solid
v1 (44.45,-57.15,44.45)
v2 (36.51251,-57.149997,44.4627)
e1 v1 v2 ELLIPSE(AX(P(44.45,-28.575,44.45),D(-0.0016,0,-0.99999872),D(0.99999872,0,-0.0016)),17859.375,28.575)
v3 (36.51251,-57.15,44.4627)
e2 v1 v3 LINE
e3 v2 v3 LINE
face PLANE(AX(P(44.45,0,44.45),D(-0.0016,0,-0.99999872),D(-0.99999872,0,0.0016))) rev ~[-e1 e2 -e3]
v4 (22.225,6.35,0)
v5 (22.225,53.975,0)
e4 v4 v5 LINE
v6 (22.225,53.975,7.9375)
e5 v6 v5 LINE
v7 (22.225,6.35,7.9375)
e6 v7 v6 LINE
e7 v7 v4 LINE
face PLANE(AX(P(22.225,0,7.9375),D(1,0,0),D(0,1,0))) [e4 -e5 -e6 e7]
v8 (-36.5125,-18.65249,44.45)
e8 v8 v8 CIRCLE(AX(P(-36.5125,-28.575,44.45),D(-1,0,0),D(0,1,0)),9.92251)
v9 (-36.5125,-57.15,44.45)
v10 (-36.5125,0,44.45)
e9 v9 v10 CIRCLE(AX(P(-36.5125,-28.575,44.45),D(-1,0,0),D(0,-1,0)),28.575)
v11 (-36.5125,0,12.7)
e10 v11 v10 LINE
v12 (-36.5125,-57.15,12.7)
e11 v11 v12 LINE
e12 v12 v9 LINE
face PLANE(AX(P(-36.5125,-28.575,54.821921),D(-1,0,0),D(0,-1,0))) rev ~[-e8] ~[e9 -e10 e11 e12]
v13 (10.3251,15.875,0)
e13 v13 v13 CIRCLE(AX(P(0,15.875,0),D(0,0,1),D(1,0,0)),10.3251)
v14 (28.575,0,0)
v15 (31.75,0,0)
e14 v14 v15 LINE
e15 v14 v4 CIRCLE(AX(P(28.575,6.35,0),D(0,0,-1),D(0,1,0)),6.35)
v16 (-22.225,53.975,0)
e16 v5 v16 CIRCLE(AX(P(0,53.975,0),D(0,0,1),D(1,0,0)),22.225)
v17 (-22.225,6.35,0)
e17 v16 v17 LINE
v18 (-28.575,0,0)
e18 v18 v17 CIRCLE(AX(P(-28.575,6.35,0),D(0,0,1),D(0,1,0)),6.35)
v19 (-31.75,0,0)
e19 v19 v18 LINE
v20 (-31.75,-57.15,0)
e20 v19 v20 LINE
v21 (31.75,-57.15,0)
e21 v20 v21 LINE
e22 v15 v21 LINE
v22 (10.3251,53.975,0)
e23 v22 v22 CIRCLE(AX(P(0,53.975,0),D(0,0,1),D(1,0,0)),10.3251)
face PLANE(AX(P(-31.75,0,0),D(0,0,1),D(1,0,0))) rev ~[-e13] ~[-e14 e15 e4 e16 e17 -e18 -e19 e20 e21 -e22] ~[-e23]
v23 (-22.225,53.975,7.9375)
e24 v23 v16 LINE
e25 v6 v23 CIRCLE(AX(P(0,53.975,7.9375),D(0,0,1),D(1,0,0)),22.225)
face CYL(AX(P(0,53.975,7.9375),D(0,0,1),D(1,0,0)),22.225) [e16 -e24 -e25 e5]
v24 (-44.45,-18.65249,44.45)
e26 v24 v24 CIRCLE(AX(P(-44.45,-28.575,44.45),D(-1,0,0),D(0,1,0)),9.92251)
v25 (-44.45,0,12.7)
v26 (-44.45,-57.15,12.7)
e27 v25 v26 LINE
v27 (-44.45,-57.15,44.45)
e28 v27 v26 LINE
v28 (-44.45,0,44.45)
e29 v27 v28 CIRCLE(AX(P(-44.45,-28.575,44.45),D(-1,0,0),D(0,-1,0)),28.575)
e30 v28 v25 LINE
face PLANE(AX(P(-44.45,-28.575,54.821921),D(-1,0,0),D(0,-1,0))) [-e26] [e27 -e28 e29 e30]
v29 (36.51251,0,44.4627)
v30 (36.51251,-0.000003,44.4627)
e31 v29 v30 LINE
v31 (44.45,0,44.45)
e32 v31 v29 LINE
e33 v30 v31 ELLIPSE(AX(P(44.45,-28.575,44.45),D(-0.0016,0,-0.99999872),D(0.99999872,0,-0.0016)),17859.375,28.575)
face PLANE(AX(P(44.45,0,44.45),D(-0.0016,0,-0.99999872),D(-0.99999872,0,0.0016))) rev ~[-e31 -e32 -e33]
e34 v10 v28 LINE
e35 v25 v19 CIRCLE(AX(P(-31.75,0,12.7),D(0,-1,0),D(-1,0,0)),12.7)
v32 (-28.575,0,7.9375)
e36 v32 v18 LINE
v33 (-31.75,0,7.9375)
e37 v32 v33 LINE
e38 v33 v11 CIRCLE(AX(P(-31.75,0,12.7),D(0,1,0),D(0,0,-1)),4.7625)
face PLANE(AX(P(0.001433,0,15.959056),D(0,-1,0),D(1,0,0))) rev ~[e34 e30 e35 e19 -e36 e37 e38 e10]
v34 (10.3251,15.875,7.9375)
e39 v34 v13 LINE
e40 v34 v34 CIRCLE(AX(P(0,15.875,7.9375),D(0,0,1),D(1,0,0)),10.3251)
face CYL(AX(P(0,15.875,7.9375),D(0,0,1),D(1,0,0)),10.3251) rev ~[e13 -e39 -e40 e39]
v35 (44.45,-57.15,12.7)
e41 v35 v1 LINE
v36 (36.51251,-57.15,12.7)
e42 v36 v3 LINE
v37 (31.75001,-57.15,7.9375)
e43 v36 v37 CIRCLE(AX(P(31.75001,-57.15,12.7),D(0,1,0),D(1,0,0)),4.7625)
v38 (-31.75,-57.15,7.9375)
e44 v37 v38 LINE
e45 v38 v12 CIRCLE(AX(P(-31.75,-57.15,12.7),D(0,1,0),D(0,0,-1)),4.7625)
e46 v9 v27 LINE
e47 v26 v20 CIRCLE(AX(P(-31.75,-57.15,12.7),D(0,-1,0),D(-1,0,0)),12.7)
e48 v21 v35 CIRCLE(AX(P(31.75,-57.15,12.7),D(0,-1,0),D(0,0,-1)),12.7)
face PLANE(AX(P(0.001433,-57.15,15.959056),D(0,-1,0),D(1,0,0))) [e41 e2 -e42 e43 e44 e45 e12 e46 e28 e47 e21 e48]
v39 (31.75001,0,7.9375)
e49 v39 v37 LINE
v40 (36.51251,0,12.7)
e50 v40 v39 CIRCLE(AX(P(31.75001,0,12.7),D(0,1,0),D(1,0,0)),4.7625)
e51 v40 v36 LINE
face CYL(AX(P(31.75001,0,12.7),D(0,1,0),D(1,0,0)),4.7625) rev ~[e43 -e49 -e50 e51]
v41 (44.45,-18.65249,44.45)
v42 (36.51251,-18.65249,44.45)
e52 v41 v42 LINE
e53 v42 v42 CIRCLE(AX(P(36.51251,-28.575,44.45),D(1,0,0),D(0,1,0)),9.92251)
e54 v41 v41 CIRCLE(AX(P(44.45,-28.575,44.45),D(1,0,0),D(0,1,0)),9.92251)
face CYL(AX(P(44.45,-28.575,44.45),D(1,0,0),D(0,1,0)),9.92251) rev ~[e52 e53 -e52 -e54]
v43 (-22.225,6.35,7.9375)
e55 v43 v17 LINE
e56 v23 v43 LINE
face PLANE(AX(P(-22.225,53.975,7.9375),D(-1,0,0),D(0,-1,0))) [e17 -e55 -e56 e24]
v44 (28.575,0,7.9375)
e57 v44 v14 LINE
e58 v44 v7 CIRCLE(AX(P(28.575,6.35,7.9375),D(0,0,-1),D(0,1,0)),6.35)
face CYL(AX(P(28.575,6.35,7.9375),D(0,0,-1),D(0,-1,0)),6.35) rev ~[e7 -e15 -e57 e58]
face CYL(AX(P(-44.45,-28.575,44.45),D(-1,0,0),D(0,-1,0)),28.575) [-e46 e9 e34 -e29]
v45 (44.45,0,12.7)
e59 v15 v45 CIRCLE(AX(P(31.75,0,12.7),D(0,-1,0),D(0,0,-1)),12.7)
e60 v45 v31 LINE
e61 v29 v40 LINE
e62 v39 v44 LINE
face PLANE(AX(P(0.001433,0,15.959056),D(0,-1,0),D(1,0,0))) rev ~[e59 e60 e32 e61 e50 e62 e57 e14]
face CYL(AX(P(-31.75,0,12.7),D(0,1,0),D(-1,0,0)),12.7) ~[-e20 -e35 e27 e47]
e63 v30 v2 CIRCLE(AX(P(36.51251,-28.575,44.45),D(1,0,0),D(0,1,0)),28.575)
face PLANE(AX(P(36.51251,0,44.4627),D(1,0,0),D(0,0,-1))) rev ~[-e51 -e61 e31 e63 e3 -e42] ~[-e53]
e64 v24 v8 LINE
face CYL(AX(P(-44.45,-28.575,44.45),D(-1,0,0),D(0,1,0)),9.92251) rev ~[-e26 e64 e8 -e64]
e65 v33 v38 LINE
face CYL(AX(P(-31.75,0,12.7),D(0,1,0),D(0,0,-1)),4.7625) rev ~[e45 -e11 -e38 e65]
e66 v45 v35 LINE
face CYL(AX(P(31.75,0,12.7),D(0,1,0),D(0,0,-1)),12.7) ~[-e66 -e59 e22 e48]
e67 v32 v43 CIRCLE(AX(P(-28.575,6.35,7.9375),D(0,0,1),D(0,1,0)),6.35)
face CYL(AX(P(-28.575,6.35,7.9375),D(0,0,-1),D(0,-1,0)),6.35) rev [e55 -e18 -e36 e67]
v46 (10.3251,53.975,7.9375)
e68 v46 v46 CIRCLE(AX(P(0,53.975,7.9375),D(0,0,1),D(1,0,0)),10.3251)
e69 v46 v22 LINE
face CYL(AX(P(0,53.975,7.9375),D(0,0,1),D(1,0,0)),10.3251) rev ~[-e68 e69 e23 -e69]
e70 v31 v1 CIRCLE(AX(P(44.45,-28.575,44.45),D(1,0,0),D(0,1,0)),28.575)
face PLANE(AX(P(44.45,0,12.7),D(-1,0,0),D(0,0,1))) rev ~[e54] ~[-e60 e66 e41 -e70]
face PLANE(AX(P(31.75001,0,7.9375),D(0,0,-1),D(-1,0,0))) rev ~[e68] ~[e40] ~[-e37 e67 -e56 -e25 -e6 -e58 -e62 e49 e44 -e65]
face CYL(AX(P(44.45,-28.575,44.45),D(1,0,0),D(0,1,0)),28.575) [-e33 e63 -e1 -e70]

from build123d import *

# Parameters (mm, degrees)
F1_DEPTH = 57.15
F3_DEPTH = 7.93748984
F4_DEPTH = 7.93748984
F6_DEPTH = 7.9375
F7_DEPTH = 7.9375
F8_R     = 10.3251
F9_DEPTH = 7.9375
F10_R    = 6.35


with BuildPart() as f1:
    # F0 (on Front) → F1 (new body)
    with BuildSketch(Plane.XZ):
        with BuildLine():
            Line((-31.75, 0), (0, 0))
            Line((0, 0), (31.75, 0))
            ThreePointArc((31.75, 0), (40.7302561211, 3.7197438789), (44.45, 12.7))
            Line((44.45, 12.7), (44.45, 44.45))
            Line((44.45, 44.45), (36.51251016, 44.4627))
            Line((36.51251016, 44.4627), (36.51251016, 12.7))
            ThreePointArc((36.51251016, 12.7), (35.1176062054, 9.3324039546), (31.75001016, 7.9375))
            Line((31.75001016, 7.9375), (-31.75, 7.9375))
            ThreePointArc((-31.75, 7.9375), (-35.1175960454, 9.3324039546), (-36.5125, 12.7))
            Line((-36.5125, 12.7), (-36.5125, 44.45))
            Line((-36.5125, 44.45), (-44.45, 44.45))
            Line((-44.45, 44.45), (-44.45, 12.7))
            ThreePointArc((-44.45, 12.7), (-40.7302561211, 3.7197438789), (-31.75, 0))
        make_face()
    extrude(amount=F1_DEPTH)

    # F2 (on face) → F3 (join, through all)
    with BuildSketch(Plane.YZ.offset(44.45)):
        with BuildLine():
            ThreePointArc((0, 44.45), (-28.575, 73.025), (-57.15, 44.45))
            Line((-57.15, 44.45), (-38.49751, 44.45))
            ThreePointArc((-38.49751, 44.45), (-28.575, 54.37251), (-18.65249, 44.45))
            Line((-18.65249, 44.45), (0, 44.45))
        make_face()
        with BuildLine():
            ThreePointArc((-18.65249, 44.45), (-28.575, 54.37251), (-38.49751, 44.45))
            ThreePointArc((-38.49751, 44.45), (-28.575, 34.52749), (-18.65249, 44.45))
        make_face()
    extrude(amount=-F3_DEPTH)

    # F2 (on face) → F4 (cut, through all)
    with BuildSketch(Plane.YZ.offset(44.45)):
        with BuildLine():
            Line((-18.65249, 44.45), (-38.49751, 44.45))
            ThreePointArc((-38.49751, 44.45), (-28.575, 34.52749), (-18.65249, 44.45))
        make_face()
        with BuildLine():
            ThreePointArc((-18.65249, 44.45), (-28.575, 54.37251), (-38.49751, 44.45))
            Line((-38.49751, 44.45), (-18.65249, 44.45))
        make_face()
    extrude(amount=-F4_DEPTH, mode=Mode.SUBTRACT)

    # F5 (on face) → F6 (join, through all)
    with BuildSketch(Plane(origin=(-44.45, 0, 0), x_dir=(0, -1, 0), z_dir=(-1, 0, 0))):
        with BuildLine():
            ThreePointArc((57.15, 44.45), (28.575, 73.025), (0, 44.45))
            Line((0, 44.45), (18.65249, 44.45))
            ThreePointArc((18.65249, 44.45), (28.575, 54.37251), (38.49751, 44.45))
            Line((38.49751, 44.45), (57.15, 44.45))
        make_face()
        with BuildLine():
            ThreePointArc((38.49751, 44.45), (28.575, 54.37251), (18.65249, 44.45))
            ThreePointArc((18.65249, 44.45), (28.575, 34.52749), (38.49751, 44.45))
        make_face()
    extrude(amount=-F6_DEPTH)

    # F5 (on face) → F7 (cut, through all)
    with BuildSketch(Plane(origin=(-44.45, 0, 0), x_dir=(0, -1, 0), z_dir=(-1, 0, 0))):
        with BuildLine():
            ThreePointArc((38.49751, 44.45), (28.575, 54.37251), (18.65249, 44.45))
            Line((18.65249, 44.45), (38.49751, 44.45))
        make_face()
        with BuildLine():
            Line((38.49751, 44.45), (18.65249, 44.45))
            ThreePointArc((18.65249, 44.45), (28.575, 34.52749), (38.49751, 44.45))
        make_face()
    extrude(amount=-F7_DEPTH, mode=Mode.SUBTRACT)

    # F8 (on face) → F9 (join, through all)
    with BuildSketch(Plane.XY.offset(7.9375)):
        with BuildLine():
            ThreePointArc((22.225, 53.975), (0, 76.2), (-22.225, 53.975))
            Line((-22.225, 53.975), (-22.225, 0))
            Line((-22.225, 0), (22.225, 0))
            Line((22.225, 0), (22.225, 53.975))
        make_face()
        with Locations((0, 15.875)):
            Circle(F8_R, mode=Mode.SUBTRACT)
        with Locations((0, 53.975)):
            Circle(F8_R, mode=Mode.SUBTRACT)
    extrude(amount=-F9_DEPTH)

    # F10
    f10_edges = [f1.edges().sort_by_distance(p)[0] for p in [
        (22.225, 0, 3.96875),
        (-22.225, 0, 3.96875),
    ]]
    fillet(f10_edges, radius=F10_R)


solid = f1.part
